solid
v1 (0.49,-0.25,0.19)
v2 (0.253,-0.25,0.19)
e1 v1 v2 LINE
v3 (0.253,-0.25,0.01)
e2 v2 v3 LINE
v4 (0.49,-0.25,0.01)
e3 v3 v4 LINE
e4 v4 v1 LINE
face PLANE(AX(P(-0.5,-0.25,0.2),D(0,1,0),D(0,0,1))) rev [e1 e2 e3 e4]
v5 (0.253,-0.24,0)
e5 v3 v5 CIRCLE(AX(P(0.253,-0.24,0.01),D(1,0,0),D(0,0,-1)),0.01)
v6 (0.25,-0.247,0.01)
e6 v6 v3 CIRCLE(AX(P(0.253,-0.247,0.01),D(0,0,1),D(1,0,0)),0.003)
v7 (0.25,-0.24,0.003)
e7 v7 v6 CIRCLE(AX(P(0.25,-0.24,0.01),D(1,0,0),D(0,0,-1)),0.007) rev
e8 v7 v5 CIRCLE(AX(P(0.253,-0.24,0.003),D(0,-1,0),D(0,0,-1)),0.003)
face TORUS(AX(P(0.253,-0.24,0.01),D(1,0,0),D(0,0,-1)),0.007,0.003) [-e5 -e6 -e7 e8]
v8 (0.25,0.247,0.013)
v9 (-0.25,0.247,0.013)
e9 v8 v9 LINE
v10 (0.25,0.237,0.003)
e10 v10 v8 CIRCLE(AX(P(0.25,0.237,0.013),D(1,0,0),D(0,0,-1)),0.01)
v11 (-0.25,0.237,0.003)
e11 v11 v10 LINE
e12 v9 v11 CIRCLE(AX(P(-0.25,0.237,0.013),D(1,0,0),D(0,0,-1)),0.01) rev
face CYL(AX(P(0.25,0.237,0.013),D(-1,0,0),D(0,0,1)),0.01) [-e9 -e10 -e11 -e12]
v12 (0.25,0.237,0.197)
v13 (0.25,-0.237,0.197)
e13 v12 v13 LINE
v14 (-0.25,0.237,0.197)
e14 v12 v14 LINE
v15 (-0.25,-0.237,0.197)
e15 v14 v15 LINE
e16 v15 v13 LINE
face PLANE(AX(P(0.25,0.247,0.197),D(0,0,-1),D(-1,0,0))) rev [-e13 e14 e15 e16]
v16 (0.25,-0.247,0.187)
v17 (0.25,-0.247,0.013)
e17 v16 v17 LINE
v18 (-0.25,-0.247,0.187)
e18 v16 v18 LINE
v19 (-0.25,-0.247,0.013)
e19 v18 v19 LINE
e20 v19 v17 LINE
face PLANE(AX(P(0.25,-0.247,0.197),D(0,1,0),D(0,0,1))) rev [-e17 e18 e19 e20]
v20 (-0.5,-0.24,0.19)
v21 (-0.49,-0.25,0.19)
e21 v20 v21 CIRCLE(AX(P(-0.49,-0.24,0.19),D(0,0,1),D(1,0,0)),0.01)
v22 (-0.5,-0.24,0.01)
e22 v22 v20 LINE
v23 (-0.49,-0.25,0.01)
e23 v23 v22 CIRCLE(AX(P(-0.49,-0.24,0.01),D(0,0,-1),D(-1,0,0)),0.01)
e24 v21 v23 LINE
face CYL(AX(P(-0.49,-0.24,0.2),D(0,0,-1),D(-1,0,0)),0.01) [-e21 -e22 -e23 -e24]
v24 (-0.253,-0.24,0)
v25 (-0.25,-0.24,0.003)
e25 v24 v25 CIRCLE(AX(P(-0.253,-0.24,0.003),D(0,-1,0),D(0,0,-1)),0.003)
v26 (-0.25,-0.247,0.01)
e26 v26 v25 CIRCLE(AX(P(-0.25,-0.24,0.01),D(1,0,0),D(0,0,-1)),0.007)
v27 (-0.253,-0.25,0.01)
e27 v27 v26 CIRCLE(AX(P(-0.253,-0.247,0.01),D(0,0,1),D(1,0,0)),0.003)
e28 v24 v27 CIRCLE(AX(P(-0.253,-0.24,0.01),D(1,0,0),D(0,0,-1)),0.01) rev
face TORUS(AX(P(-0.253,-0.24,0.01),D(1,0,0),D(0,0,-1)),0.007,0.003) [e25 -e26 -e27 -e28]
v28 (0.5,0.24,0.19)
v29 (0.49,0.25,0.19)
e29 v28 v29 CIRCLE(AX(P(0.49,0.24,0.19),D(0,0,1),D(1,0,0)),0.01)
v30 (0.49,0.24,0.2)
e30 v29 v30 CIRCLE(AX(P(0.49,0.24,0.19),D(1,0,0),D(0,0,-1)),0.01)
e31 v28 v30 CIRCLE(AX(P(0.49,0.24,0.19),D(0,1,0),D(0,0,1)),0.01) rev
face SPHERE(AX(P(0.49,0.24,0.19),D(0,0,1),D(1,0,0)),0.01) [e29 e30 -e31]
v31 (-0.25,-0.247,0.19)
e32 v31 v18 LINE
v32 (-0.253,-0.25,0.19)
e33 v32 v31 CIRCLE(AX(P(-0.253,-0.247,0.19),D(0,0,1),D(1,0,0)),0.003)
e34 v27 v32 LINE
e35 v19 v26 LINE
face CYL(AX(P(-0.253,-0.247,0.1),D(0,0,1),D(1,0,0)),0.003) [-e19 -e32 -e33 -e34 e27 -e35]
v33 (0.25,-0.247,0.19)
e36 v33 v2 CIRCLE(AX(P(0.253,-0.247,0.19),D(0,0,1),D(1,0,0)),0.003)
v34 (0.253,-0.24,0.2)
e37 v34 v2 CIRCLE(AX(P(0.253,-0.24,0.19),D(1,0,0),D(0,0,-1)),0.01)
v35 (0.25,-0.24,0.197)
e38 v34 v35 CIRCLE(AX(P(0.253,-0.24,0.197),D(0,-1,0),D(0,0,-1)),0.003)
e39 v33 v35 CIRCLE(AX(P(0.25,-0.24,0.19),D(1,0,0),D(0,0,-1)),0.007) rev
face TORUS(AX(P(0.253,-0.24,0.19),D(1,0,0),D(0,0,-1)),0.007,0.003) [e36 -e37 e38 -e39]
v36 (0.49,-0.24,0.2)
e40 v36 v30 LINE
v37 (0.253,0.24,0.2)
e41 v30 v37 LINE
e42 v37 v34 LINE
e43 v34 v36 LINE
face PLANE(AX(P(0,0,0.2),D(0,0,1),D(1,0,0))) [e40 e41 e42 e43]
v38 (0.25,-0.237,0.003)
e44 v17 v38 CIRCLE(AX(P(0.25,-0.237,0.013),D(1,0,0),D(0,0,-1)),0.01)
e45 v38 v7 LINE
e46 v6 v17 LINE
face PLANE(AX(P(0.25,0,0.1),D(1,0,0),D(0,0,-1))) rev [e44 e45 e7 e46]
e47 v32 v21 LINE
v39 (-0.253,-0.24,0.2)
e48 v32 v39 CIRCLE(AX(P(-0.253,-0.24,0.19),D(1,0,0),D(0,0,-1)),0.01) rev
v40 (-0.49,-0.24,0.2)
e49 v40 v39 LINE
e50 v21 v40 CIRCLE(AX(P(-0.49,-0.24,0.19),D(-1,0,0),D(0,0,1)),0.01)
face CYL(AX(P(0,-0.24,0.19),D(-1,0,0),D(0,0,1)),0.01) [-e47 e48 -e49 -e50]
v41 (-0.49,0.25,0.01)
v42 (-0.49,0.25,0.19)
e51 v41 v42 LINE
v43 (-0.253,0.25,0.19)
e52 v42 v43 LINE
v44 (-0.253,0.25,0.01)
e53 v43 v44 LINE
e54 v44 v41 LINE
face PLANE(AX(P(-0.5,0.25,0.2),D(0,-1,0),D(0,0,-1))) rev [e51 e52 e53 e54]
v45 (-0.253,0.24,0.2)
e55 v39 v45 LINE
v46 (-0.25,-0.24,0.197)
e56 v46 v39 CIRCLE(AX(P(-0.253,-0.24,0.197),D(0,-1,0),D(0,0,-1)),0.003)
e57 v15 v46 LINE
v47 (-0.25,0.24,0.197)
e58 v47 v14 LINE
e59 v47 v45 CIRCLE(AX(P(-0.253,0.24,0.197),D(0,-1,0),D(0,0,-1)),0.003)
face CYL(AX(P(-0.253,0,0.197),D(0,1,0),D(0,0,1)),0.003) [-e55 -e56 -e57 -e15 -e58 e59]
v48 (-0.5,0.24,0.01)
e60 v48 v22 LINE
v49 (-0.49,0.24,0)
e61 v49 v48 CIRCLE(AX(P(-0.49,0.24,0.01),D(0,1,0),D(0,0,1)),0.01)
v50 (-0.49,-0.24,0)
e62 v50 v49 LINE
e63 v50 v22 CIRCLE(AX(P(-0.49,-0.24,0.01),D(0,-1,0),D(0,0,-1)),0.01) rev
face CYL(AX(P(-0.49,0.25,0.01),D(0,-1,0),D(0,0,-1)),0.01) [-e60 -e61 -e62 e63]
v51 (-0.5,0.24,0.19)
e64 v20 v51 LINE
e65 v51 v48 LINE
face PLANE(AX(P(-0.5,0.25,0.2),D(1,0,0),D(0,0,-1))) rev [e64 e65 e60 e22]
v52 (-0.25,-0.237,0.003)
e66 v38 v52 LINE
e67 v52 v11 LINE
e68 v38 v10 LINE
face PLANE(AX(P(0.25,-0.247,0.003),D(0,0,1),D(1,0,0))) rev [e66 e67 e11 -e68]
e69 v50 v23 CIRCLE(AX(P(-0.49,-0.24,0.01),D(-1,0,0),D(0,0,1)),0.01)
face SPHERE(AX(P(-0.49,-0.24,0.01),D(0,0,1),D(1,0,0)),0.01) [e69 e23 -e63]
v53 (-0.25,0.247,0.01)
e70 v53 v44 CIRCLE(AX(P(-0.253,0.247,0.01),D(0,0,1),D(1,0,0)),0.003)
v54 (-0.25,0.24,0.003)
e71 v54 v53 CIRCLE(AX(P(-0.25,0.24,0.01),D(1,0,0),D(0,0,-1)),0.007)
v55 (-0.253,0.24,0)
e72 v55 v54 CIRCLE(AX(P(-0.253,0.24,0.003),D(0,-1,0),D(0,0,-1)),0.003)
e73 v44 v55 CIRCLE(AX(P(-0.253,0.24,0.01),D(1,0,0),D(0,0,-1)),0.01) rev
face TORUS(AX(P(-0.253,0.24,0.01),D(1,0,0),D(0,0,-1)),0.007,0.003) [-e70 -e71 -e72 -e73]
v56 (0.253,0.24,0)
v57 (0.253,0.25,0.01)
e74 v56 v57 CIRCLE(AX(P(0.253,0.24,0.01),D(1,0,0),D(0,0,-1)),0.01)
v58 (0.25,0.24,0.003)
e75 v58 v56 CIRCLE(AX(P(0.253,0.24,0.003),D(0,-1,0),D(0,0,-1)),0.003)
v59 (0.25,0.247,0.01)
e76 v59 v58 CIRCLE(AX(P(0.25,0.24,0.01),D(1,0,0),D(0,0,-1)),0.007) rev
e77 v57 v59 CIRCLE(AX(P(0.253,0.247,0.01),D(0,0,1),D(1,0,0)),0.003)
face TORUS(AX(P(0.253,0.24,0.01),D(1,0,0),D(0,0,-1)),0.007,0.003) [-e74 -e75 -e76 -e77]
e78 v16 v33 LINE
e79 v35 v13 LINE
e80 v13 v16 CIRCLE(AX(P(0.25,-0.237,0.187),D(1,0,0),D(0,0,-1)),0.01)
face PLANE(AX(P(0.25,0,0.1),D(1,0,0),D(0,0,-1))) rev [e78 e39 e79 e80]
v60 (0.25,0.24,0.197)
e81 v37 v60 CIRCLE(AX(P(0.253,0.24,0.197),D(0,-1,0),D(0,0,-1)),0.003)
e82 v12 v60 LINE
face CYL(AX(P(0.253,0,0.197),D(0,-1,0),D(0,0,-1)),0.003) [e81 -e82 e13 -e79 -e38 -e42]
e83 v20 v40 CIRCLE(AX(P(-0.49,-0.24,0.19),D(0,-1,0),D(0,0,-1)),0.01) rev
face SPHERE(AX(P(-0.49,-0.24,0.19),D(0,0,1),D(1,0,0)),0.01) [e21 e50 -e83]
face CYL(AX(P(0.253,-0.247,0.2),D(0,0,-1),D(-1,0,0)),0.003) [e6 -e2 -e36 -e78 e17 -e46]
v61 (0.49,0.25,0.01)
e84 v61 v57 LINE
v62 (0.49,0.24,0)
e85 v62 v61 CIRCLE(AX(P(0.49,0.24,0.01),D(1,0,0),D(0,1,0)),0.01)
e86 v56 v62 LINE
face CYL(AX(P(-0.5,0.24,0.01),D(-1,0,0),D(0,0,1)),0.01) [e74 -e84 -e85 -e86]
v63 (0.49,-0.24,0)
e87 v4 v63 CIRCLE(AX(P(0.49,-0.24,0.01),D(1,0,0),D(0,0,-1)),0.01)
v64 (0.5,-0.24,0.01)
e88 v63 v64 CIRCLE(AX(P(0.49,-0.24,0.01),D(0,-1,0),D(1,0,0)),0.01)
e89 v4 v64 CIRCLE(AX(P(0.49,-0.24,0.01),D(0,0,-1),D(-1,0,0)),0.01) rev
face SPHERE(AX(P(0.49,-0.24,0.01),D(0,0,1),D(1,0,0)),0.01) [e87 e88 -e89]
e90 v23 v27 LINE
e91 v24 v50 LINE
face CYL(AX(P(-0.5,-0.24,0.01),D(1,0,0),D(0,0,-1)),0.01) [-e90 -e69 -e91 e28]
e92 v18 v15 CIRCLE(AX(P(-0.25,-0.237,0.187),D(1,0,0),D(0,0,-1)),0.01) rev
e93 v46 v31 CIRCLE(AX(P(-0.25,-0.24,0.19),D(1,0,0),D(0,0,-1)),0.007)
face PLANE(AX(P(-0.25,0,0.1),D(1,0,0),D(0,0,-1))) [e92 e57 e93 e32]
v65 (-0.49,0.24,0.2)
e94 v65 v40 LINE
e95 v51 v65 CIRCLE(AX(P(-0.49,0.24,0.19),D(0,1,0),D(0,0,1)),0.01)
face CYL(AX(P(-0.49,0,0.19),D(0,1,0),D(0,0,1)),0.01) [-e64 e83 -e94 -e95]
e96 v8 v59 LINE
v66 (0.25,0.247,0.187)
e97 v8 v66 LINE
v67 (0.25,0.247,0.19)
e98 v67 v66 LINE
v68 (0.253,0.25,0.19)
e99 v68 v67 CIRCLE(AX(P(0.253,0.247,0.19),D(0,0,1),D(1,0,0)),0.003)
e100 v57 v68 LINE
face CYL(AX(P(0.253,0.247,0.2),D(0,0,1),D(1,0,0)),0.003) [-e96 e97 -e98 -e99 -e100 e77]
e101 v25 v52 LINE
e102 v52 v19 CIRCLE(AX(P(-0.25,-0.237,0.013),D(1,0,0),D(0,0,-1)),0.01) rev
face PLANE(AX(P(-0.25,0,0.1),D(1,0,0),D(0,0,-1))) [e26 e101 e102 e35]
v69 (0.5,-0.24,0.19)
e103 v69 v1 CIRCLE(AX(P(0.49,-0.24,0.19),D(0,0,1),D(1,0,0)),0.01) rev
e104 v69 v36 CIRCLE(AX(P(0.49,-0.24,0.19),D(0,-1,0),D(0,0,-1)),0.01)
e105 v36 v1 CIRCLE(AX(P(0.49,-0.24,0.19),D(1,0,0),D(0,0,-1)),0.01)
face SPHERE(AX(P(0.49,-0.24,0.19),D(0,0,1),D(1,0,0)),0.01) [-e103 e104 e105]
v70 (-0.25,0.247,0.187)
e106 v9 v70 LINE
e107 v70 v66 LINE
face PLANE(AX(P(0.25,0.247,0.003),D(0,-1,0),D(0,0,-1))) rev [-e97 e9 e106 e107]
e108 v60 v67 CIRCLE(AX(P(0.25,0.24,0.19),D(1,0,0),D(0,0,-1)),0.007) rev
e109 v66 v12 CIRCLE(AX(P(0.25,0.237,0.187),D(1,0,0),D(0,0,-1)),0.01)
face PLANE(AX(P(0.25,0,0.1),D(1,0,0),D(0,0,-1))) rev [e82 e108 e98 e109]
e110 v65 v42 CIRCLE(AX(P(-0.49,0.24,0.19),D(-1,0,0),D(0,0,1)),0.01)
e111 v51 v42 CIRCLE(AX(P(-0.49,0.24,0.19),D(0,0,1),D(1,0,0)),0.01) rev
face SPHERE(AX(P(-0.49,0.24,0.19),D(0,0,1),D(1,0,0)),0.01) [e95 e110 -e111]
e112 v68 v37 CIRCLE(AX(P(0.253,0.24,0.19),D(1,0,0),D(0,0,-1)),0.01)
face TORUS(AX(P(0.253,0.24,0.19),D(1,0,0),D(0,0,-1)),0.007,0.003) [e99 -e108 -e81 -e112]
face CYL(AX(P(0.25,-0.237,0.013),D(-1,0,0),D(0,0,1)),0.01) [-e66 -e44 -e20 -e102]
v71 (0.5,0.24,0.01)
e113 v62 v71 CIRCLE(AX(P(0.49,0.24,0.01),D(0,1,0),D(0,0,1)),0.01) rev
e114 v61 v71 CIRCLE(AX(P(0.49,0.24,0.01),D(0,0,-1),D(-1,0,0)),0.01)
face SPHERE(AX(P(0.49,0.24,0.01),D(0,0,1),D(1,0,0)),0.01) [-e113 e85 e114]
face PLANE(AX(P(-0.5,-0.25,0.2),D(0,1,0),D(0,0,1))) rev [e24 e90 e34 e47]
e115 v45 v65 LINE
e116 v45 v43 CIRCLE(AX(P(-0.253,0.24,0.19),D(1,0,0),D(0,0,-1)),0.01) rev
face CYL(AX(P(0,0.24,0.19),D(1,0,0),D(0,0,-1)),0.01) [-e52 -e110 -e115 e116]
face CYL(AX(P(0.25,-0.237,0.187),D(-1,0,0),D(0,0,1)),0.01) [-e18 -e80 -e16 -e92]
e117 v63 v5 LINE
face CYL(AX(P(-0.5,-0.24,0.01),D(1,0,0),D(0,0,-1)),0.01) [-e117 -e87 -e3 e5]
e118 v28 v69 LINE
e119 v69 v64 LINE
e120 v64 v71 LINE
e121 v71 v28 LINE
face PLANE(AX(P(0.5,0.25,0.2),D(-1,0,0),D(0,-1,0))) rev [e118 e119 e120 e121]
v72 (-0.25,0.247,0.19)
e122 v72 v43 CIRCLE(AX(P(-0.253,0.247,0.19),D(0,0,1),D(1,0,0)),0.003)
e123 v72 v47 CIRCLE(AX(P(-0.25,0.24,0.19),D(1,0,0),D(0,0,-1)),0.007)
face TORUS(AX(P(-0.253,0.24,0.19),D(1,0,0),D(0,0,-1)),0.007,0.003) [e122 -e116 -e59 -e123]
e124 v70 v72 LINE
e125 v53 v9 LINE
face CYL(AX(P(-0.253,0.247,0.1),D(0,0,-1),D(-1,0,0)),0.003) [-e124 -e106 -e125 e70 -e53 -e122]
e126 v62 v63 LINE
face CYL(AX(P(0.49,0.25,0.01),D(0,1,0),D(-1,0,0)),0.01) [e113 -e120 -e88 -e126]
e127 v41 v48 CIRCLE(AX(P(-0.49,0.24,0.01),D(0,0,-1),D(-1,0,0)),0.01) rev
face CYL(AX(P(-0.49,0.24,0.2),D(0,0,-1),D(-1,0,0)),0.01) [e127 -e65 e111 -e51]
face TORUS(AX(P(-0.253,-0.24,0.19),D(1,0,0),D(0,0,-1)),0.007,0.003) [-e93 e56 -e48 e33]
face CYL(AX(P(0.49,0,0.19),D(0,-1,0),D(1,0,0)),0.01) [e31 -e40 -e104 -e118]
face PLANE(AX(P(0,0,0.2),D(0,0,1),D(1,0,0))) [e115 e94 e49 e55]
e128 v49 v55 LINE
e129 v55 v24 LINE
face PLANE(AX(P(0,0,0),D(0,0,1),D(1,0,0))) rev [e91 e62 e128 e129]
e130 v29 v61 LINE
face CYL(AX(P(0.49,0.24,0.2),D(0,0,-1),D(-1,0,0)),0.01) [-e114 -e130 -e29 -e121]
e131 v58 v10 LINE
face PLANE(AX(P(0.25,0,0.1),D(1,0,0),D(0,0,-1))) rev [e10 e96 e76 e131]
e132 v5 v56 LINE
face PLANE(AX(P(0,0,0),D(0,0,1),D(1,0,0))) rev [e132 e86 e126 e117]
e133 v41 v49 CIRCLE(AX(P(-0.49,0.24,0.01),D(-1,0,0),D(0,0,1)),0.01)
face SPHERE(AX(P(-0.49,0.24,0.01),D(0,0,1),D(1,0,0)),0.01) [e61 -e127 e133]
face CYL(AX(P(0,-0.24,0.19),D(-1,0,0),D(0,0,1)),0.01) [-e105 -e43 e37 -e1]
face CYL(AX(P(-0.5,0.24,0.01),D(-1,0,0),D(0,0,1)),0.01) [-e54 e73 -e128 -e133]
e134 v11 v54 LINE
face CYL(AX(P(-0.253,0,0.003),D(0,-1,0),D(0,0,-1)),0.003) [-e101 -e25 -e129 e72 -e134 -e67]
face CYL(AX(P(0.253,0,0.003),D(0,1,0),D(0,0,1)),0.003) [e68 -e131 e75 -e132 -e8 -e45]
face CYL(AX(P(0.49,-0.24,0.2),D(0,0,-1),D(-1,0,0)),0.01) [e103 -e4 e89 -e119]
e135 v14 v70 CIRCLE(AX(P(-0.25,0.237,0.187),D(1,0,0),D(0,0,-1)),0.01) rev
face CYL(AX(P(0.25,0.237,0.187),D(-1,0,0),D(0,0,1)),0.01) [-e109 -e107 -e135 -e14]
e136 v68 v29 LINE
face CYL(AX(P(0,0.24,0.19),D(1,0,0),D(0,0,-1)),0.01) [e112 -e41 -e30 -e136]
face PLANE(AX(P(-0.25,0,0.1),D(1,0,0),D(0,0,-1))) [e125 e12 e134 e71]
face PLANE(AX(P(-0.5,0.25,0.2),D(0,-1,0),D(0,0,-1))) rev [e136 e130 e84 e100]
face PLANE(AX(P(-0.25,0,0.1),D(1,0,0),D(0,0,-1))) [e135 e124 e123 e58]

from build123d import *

# Parameters (mm, degrees)
SKETCH1_W                           = 1
SKETCH1_H                           = 0.5
ALL_BODY_DEPTH                      = 0.2
CUT_OUT_THE_BODY_FOR_PIN_DEPTH      = 0.25
CUT_OUT_THE_BODY_FOR_PIN_DEPTH_BACK = 0.25
SKETCH2_OUTSIDE_W                   = 2.428
SKETCH2_OUTSIDE_H                   = 2.728
SKETCH2_OUTSIDE_W_2                 = 0.194
SKETCH2_OUTSIDE_H_2                 = 0.494
BODY_FILLET_R                       = 0.01
PIN_FILLET_A_R                      = 0.01
PIN_FILLET_B_R                      = 0.003


with BuildPart() as part:
    # Sketch1 → All body (new body)
    with BuildSketch(Plane.XY):
        Rectangle(SKETCH1_W, SKETCH1_H)
    extrude(amount=ALL_BODY_DEPTH)

    # Sketch2 outside → Cut out the body for pin (cut, two sides: drawn at the far end of the back side and taken through both)
    with BuildSketch(Plane(origin=(0, 0, 0), x_dir=(0, 0, -1), z_dir=(1, 0, 0)).offset(-CUT_OUT_THE_BODY_FOR_PIN_DEPTH_BACK)):
        with Locations((-0.1, 0)):
            Rectangle(SKETCH2_OUTSIDE_W, SKETCH2_OUTSIDE_H)
        with Locations((-0.1, 0)):
            Rectangle(SKETCH2_OUTSIDE_W_2, SKETCH2_OUTSIDE_H_2, mode=Mode.SUBTRACT)
    extrude(amount=CUT_OUT_THE_BODY_FOR_PIN_DEPTH + CUT_OUT_THE_BODY_FOR_PIN_DEPTH_BACK, mode=Mode.SUBTRACT)

    # Body fillet
    body_fillet_edges = [part.edges().sort_by_distance(p)[0] for p in [
        (0, 0.247, 0.003),
        (0, 0.247, 0.197),
        (0, -0.247, 0.197),
        (0, -0.247, 0.003),
    ]]
    fillet(body_fillet_edges, radius=BODY_FILLET_R)

    # Pin fillet a
    pin_fillet_a_edges = [part.edges().sort_by_distance(p)[0] for p in [
        (0.5, 0, 0.2),
        (-0.375, 0.25, 0),
        (0.375, -0.25, 0),
        (0.375, -0.25, 0.2),
        (-0.375, 0.25, 0.2),
        (0.375, 0.25, 0.2),
        (-0.5, 0, 0.2),
        (0.375, 0.25, 0),
        (0.5, 0, 0),
        (-0.375, -0.25, 0),
        (-0.5, 0, 0),
        (-0.5, 0.25, 0.1),
        (0.5, 0.25, 0.1),
        (0.5, -0.25, 0.1),
        (-0.5, -0.25, 0.1),
        (-0.375, -0.25, 0.2),
    ]]
    fillet(pin_fillet_a_edges, radius=PIN_FILLET_A_R)

    # Pin fillet b
    pin_fillet_b_edges = [part.edges().sort_by_distance(p)[0] for p in [
        (0.25, -0.25, 0.1),
        (0.25, 0, 0.2),
        (0.25, 0.25, 0.1),
        (0.25, 0, 0),
        (-0.25, 0.25, 0.1),
        (-0.25, 0, 0.2),
        (-0.25, -0.25, 0.1),
        (-0.25, 0, 0),
        (0.25, 0.247071068, 0.002928932),
        (0.25, -0.247071068, 0.002928932),
        (0.25, -0.247071068, 0.197071068),
        (0.25, 0.247071068, 0.197071068),
        (-0.25, -0.247071068, 0.197071068),
        (-0.25, 0.247071068, 0.197071068),
        (-0.25, -0.247071068, 0.002928932),
        (-0.25, 0.247071068, 0.002928932),
    ]]
    fillet(pin_fillet_b_edges, radius=PIN_FILLET_B_R - 0.0001)  # a hair under: the kernel refuses the full size


solid = part.part
